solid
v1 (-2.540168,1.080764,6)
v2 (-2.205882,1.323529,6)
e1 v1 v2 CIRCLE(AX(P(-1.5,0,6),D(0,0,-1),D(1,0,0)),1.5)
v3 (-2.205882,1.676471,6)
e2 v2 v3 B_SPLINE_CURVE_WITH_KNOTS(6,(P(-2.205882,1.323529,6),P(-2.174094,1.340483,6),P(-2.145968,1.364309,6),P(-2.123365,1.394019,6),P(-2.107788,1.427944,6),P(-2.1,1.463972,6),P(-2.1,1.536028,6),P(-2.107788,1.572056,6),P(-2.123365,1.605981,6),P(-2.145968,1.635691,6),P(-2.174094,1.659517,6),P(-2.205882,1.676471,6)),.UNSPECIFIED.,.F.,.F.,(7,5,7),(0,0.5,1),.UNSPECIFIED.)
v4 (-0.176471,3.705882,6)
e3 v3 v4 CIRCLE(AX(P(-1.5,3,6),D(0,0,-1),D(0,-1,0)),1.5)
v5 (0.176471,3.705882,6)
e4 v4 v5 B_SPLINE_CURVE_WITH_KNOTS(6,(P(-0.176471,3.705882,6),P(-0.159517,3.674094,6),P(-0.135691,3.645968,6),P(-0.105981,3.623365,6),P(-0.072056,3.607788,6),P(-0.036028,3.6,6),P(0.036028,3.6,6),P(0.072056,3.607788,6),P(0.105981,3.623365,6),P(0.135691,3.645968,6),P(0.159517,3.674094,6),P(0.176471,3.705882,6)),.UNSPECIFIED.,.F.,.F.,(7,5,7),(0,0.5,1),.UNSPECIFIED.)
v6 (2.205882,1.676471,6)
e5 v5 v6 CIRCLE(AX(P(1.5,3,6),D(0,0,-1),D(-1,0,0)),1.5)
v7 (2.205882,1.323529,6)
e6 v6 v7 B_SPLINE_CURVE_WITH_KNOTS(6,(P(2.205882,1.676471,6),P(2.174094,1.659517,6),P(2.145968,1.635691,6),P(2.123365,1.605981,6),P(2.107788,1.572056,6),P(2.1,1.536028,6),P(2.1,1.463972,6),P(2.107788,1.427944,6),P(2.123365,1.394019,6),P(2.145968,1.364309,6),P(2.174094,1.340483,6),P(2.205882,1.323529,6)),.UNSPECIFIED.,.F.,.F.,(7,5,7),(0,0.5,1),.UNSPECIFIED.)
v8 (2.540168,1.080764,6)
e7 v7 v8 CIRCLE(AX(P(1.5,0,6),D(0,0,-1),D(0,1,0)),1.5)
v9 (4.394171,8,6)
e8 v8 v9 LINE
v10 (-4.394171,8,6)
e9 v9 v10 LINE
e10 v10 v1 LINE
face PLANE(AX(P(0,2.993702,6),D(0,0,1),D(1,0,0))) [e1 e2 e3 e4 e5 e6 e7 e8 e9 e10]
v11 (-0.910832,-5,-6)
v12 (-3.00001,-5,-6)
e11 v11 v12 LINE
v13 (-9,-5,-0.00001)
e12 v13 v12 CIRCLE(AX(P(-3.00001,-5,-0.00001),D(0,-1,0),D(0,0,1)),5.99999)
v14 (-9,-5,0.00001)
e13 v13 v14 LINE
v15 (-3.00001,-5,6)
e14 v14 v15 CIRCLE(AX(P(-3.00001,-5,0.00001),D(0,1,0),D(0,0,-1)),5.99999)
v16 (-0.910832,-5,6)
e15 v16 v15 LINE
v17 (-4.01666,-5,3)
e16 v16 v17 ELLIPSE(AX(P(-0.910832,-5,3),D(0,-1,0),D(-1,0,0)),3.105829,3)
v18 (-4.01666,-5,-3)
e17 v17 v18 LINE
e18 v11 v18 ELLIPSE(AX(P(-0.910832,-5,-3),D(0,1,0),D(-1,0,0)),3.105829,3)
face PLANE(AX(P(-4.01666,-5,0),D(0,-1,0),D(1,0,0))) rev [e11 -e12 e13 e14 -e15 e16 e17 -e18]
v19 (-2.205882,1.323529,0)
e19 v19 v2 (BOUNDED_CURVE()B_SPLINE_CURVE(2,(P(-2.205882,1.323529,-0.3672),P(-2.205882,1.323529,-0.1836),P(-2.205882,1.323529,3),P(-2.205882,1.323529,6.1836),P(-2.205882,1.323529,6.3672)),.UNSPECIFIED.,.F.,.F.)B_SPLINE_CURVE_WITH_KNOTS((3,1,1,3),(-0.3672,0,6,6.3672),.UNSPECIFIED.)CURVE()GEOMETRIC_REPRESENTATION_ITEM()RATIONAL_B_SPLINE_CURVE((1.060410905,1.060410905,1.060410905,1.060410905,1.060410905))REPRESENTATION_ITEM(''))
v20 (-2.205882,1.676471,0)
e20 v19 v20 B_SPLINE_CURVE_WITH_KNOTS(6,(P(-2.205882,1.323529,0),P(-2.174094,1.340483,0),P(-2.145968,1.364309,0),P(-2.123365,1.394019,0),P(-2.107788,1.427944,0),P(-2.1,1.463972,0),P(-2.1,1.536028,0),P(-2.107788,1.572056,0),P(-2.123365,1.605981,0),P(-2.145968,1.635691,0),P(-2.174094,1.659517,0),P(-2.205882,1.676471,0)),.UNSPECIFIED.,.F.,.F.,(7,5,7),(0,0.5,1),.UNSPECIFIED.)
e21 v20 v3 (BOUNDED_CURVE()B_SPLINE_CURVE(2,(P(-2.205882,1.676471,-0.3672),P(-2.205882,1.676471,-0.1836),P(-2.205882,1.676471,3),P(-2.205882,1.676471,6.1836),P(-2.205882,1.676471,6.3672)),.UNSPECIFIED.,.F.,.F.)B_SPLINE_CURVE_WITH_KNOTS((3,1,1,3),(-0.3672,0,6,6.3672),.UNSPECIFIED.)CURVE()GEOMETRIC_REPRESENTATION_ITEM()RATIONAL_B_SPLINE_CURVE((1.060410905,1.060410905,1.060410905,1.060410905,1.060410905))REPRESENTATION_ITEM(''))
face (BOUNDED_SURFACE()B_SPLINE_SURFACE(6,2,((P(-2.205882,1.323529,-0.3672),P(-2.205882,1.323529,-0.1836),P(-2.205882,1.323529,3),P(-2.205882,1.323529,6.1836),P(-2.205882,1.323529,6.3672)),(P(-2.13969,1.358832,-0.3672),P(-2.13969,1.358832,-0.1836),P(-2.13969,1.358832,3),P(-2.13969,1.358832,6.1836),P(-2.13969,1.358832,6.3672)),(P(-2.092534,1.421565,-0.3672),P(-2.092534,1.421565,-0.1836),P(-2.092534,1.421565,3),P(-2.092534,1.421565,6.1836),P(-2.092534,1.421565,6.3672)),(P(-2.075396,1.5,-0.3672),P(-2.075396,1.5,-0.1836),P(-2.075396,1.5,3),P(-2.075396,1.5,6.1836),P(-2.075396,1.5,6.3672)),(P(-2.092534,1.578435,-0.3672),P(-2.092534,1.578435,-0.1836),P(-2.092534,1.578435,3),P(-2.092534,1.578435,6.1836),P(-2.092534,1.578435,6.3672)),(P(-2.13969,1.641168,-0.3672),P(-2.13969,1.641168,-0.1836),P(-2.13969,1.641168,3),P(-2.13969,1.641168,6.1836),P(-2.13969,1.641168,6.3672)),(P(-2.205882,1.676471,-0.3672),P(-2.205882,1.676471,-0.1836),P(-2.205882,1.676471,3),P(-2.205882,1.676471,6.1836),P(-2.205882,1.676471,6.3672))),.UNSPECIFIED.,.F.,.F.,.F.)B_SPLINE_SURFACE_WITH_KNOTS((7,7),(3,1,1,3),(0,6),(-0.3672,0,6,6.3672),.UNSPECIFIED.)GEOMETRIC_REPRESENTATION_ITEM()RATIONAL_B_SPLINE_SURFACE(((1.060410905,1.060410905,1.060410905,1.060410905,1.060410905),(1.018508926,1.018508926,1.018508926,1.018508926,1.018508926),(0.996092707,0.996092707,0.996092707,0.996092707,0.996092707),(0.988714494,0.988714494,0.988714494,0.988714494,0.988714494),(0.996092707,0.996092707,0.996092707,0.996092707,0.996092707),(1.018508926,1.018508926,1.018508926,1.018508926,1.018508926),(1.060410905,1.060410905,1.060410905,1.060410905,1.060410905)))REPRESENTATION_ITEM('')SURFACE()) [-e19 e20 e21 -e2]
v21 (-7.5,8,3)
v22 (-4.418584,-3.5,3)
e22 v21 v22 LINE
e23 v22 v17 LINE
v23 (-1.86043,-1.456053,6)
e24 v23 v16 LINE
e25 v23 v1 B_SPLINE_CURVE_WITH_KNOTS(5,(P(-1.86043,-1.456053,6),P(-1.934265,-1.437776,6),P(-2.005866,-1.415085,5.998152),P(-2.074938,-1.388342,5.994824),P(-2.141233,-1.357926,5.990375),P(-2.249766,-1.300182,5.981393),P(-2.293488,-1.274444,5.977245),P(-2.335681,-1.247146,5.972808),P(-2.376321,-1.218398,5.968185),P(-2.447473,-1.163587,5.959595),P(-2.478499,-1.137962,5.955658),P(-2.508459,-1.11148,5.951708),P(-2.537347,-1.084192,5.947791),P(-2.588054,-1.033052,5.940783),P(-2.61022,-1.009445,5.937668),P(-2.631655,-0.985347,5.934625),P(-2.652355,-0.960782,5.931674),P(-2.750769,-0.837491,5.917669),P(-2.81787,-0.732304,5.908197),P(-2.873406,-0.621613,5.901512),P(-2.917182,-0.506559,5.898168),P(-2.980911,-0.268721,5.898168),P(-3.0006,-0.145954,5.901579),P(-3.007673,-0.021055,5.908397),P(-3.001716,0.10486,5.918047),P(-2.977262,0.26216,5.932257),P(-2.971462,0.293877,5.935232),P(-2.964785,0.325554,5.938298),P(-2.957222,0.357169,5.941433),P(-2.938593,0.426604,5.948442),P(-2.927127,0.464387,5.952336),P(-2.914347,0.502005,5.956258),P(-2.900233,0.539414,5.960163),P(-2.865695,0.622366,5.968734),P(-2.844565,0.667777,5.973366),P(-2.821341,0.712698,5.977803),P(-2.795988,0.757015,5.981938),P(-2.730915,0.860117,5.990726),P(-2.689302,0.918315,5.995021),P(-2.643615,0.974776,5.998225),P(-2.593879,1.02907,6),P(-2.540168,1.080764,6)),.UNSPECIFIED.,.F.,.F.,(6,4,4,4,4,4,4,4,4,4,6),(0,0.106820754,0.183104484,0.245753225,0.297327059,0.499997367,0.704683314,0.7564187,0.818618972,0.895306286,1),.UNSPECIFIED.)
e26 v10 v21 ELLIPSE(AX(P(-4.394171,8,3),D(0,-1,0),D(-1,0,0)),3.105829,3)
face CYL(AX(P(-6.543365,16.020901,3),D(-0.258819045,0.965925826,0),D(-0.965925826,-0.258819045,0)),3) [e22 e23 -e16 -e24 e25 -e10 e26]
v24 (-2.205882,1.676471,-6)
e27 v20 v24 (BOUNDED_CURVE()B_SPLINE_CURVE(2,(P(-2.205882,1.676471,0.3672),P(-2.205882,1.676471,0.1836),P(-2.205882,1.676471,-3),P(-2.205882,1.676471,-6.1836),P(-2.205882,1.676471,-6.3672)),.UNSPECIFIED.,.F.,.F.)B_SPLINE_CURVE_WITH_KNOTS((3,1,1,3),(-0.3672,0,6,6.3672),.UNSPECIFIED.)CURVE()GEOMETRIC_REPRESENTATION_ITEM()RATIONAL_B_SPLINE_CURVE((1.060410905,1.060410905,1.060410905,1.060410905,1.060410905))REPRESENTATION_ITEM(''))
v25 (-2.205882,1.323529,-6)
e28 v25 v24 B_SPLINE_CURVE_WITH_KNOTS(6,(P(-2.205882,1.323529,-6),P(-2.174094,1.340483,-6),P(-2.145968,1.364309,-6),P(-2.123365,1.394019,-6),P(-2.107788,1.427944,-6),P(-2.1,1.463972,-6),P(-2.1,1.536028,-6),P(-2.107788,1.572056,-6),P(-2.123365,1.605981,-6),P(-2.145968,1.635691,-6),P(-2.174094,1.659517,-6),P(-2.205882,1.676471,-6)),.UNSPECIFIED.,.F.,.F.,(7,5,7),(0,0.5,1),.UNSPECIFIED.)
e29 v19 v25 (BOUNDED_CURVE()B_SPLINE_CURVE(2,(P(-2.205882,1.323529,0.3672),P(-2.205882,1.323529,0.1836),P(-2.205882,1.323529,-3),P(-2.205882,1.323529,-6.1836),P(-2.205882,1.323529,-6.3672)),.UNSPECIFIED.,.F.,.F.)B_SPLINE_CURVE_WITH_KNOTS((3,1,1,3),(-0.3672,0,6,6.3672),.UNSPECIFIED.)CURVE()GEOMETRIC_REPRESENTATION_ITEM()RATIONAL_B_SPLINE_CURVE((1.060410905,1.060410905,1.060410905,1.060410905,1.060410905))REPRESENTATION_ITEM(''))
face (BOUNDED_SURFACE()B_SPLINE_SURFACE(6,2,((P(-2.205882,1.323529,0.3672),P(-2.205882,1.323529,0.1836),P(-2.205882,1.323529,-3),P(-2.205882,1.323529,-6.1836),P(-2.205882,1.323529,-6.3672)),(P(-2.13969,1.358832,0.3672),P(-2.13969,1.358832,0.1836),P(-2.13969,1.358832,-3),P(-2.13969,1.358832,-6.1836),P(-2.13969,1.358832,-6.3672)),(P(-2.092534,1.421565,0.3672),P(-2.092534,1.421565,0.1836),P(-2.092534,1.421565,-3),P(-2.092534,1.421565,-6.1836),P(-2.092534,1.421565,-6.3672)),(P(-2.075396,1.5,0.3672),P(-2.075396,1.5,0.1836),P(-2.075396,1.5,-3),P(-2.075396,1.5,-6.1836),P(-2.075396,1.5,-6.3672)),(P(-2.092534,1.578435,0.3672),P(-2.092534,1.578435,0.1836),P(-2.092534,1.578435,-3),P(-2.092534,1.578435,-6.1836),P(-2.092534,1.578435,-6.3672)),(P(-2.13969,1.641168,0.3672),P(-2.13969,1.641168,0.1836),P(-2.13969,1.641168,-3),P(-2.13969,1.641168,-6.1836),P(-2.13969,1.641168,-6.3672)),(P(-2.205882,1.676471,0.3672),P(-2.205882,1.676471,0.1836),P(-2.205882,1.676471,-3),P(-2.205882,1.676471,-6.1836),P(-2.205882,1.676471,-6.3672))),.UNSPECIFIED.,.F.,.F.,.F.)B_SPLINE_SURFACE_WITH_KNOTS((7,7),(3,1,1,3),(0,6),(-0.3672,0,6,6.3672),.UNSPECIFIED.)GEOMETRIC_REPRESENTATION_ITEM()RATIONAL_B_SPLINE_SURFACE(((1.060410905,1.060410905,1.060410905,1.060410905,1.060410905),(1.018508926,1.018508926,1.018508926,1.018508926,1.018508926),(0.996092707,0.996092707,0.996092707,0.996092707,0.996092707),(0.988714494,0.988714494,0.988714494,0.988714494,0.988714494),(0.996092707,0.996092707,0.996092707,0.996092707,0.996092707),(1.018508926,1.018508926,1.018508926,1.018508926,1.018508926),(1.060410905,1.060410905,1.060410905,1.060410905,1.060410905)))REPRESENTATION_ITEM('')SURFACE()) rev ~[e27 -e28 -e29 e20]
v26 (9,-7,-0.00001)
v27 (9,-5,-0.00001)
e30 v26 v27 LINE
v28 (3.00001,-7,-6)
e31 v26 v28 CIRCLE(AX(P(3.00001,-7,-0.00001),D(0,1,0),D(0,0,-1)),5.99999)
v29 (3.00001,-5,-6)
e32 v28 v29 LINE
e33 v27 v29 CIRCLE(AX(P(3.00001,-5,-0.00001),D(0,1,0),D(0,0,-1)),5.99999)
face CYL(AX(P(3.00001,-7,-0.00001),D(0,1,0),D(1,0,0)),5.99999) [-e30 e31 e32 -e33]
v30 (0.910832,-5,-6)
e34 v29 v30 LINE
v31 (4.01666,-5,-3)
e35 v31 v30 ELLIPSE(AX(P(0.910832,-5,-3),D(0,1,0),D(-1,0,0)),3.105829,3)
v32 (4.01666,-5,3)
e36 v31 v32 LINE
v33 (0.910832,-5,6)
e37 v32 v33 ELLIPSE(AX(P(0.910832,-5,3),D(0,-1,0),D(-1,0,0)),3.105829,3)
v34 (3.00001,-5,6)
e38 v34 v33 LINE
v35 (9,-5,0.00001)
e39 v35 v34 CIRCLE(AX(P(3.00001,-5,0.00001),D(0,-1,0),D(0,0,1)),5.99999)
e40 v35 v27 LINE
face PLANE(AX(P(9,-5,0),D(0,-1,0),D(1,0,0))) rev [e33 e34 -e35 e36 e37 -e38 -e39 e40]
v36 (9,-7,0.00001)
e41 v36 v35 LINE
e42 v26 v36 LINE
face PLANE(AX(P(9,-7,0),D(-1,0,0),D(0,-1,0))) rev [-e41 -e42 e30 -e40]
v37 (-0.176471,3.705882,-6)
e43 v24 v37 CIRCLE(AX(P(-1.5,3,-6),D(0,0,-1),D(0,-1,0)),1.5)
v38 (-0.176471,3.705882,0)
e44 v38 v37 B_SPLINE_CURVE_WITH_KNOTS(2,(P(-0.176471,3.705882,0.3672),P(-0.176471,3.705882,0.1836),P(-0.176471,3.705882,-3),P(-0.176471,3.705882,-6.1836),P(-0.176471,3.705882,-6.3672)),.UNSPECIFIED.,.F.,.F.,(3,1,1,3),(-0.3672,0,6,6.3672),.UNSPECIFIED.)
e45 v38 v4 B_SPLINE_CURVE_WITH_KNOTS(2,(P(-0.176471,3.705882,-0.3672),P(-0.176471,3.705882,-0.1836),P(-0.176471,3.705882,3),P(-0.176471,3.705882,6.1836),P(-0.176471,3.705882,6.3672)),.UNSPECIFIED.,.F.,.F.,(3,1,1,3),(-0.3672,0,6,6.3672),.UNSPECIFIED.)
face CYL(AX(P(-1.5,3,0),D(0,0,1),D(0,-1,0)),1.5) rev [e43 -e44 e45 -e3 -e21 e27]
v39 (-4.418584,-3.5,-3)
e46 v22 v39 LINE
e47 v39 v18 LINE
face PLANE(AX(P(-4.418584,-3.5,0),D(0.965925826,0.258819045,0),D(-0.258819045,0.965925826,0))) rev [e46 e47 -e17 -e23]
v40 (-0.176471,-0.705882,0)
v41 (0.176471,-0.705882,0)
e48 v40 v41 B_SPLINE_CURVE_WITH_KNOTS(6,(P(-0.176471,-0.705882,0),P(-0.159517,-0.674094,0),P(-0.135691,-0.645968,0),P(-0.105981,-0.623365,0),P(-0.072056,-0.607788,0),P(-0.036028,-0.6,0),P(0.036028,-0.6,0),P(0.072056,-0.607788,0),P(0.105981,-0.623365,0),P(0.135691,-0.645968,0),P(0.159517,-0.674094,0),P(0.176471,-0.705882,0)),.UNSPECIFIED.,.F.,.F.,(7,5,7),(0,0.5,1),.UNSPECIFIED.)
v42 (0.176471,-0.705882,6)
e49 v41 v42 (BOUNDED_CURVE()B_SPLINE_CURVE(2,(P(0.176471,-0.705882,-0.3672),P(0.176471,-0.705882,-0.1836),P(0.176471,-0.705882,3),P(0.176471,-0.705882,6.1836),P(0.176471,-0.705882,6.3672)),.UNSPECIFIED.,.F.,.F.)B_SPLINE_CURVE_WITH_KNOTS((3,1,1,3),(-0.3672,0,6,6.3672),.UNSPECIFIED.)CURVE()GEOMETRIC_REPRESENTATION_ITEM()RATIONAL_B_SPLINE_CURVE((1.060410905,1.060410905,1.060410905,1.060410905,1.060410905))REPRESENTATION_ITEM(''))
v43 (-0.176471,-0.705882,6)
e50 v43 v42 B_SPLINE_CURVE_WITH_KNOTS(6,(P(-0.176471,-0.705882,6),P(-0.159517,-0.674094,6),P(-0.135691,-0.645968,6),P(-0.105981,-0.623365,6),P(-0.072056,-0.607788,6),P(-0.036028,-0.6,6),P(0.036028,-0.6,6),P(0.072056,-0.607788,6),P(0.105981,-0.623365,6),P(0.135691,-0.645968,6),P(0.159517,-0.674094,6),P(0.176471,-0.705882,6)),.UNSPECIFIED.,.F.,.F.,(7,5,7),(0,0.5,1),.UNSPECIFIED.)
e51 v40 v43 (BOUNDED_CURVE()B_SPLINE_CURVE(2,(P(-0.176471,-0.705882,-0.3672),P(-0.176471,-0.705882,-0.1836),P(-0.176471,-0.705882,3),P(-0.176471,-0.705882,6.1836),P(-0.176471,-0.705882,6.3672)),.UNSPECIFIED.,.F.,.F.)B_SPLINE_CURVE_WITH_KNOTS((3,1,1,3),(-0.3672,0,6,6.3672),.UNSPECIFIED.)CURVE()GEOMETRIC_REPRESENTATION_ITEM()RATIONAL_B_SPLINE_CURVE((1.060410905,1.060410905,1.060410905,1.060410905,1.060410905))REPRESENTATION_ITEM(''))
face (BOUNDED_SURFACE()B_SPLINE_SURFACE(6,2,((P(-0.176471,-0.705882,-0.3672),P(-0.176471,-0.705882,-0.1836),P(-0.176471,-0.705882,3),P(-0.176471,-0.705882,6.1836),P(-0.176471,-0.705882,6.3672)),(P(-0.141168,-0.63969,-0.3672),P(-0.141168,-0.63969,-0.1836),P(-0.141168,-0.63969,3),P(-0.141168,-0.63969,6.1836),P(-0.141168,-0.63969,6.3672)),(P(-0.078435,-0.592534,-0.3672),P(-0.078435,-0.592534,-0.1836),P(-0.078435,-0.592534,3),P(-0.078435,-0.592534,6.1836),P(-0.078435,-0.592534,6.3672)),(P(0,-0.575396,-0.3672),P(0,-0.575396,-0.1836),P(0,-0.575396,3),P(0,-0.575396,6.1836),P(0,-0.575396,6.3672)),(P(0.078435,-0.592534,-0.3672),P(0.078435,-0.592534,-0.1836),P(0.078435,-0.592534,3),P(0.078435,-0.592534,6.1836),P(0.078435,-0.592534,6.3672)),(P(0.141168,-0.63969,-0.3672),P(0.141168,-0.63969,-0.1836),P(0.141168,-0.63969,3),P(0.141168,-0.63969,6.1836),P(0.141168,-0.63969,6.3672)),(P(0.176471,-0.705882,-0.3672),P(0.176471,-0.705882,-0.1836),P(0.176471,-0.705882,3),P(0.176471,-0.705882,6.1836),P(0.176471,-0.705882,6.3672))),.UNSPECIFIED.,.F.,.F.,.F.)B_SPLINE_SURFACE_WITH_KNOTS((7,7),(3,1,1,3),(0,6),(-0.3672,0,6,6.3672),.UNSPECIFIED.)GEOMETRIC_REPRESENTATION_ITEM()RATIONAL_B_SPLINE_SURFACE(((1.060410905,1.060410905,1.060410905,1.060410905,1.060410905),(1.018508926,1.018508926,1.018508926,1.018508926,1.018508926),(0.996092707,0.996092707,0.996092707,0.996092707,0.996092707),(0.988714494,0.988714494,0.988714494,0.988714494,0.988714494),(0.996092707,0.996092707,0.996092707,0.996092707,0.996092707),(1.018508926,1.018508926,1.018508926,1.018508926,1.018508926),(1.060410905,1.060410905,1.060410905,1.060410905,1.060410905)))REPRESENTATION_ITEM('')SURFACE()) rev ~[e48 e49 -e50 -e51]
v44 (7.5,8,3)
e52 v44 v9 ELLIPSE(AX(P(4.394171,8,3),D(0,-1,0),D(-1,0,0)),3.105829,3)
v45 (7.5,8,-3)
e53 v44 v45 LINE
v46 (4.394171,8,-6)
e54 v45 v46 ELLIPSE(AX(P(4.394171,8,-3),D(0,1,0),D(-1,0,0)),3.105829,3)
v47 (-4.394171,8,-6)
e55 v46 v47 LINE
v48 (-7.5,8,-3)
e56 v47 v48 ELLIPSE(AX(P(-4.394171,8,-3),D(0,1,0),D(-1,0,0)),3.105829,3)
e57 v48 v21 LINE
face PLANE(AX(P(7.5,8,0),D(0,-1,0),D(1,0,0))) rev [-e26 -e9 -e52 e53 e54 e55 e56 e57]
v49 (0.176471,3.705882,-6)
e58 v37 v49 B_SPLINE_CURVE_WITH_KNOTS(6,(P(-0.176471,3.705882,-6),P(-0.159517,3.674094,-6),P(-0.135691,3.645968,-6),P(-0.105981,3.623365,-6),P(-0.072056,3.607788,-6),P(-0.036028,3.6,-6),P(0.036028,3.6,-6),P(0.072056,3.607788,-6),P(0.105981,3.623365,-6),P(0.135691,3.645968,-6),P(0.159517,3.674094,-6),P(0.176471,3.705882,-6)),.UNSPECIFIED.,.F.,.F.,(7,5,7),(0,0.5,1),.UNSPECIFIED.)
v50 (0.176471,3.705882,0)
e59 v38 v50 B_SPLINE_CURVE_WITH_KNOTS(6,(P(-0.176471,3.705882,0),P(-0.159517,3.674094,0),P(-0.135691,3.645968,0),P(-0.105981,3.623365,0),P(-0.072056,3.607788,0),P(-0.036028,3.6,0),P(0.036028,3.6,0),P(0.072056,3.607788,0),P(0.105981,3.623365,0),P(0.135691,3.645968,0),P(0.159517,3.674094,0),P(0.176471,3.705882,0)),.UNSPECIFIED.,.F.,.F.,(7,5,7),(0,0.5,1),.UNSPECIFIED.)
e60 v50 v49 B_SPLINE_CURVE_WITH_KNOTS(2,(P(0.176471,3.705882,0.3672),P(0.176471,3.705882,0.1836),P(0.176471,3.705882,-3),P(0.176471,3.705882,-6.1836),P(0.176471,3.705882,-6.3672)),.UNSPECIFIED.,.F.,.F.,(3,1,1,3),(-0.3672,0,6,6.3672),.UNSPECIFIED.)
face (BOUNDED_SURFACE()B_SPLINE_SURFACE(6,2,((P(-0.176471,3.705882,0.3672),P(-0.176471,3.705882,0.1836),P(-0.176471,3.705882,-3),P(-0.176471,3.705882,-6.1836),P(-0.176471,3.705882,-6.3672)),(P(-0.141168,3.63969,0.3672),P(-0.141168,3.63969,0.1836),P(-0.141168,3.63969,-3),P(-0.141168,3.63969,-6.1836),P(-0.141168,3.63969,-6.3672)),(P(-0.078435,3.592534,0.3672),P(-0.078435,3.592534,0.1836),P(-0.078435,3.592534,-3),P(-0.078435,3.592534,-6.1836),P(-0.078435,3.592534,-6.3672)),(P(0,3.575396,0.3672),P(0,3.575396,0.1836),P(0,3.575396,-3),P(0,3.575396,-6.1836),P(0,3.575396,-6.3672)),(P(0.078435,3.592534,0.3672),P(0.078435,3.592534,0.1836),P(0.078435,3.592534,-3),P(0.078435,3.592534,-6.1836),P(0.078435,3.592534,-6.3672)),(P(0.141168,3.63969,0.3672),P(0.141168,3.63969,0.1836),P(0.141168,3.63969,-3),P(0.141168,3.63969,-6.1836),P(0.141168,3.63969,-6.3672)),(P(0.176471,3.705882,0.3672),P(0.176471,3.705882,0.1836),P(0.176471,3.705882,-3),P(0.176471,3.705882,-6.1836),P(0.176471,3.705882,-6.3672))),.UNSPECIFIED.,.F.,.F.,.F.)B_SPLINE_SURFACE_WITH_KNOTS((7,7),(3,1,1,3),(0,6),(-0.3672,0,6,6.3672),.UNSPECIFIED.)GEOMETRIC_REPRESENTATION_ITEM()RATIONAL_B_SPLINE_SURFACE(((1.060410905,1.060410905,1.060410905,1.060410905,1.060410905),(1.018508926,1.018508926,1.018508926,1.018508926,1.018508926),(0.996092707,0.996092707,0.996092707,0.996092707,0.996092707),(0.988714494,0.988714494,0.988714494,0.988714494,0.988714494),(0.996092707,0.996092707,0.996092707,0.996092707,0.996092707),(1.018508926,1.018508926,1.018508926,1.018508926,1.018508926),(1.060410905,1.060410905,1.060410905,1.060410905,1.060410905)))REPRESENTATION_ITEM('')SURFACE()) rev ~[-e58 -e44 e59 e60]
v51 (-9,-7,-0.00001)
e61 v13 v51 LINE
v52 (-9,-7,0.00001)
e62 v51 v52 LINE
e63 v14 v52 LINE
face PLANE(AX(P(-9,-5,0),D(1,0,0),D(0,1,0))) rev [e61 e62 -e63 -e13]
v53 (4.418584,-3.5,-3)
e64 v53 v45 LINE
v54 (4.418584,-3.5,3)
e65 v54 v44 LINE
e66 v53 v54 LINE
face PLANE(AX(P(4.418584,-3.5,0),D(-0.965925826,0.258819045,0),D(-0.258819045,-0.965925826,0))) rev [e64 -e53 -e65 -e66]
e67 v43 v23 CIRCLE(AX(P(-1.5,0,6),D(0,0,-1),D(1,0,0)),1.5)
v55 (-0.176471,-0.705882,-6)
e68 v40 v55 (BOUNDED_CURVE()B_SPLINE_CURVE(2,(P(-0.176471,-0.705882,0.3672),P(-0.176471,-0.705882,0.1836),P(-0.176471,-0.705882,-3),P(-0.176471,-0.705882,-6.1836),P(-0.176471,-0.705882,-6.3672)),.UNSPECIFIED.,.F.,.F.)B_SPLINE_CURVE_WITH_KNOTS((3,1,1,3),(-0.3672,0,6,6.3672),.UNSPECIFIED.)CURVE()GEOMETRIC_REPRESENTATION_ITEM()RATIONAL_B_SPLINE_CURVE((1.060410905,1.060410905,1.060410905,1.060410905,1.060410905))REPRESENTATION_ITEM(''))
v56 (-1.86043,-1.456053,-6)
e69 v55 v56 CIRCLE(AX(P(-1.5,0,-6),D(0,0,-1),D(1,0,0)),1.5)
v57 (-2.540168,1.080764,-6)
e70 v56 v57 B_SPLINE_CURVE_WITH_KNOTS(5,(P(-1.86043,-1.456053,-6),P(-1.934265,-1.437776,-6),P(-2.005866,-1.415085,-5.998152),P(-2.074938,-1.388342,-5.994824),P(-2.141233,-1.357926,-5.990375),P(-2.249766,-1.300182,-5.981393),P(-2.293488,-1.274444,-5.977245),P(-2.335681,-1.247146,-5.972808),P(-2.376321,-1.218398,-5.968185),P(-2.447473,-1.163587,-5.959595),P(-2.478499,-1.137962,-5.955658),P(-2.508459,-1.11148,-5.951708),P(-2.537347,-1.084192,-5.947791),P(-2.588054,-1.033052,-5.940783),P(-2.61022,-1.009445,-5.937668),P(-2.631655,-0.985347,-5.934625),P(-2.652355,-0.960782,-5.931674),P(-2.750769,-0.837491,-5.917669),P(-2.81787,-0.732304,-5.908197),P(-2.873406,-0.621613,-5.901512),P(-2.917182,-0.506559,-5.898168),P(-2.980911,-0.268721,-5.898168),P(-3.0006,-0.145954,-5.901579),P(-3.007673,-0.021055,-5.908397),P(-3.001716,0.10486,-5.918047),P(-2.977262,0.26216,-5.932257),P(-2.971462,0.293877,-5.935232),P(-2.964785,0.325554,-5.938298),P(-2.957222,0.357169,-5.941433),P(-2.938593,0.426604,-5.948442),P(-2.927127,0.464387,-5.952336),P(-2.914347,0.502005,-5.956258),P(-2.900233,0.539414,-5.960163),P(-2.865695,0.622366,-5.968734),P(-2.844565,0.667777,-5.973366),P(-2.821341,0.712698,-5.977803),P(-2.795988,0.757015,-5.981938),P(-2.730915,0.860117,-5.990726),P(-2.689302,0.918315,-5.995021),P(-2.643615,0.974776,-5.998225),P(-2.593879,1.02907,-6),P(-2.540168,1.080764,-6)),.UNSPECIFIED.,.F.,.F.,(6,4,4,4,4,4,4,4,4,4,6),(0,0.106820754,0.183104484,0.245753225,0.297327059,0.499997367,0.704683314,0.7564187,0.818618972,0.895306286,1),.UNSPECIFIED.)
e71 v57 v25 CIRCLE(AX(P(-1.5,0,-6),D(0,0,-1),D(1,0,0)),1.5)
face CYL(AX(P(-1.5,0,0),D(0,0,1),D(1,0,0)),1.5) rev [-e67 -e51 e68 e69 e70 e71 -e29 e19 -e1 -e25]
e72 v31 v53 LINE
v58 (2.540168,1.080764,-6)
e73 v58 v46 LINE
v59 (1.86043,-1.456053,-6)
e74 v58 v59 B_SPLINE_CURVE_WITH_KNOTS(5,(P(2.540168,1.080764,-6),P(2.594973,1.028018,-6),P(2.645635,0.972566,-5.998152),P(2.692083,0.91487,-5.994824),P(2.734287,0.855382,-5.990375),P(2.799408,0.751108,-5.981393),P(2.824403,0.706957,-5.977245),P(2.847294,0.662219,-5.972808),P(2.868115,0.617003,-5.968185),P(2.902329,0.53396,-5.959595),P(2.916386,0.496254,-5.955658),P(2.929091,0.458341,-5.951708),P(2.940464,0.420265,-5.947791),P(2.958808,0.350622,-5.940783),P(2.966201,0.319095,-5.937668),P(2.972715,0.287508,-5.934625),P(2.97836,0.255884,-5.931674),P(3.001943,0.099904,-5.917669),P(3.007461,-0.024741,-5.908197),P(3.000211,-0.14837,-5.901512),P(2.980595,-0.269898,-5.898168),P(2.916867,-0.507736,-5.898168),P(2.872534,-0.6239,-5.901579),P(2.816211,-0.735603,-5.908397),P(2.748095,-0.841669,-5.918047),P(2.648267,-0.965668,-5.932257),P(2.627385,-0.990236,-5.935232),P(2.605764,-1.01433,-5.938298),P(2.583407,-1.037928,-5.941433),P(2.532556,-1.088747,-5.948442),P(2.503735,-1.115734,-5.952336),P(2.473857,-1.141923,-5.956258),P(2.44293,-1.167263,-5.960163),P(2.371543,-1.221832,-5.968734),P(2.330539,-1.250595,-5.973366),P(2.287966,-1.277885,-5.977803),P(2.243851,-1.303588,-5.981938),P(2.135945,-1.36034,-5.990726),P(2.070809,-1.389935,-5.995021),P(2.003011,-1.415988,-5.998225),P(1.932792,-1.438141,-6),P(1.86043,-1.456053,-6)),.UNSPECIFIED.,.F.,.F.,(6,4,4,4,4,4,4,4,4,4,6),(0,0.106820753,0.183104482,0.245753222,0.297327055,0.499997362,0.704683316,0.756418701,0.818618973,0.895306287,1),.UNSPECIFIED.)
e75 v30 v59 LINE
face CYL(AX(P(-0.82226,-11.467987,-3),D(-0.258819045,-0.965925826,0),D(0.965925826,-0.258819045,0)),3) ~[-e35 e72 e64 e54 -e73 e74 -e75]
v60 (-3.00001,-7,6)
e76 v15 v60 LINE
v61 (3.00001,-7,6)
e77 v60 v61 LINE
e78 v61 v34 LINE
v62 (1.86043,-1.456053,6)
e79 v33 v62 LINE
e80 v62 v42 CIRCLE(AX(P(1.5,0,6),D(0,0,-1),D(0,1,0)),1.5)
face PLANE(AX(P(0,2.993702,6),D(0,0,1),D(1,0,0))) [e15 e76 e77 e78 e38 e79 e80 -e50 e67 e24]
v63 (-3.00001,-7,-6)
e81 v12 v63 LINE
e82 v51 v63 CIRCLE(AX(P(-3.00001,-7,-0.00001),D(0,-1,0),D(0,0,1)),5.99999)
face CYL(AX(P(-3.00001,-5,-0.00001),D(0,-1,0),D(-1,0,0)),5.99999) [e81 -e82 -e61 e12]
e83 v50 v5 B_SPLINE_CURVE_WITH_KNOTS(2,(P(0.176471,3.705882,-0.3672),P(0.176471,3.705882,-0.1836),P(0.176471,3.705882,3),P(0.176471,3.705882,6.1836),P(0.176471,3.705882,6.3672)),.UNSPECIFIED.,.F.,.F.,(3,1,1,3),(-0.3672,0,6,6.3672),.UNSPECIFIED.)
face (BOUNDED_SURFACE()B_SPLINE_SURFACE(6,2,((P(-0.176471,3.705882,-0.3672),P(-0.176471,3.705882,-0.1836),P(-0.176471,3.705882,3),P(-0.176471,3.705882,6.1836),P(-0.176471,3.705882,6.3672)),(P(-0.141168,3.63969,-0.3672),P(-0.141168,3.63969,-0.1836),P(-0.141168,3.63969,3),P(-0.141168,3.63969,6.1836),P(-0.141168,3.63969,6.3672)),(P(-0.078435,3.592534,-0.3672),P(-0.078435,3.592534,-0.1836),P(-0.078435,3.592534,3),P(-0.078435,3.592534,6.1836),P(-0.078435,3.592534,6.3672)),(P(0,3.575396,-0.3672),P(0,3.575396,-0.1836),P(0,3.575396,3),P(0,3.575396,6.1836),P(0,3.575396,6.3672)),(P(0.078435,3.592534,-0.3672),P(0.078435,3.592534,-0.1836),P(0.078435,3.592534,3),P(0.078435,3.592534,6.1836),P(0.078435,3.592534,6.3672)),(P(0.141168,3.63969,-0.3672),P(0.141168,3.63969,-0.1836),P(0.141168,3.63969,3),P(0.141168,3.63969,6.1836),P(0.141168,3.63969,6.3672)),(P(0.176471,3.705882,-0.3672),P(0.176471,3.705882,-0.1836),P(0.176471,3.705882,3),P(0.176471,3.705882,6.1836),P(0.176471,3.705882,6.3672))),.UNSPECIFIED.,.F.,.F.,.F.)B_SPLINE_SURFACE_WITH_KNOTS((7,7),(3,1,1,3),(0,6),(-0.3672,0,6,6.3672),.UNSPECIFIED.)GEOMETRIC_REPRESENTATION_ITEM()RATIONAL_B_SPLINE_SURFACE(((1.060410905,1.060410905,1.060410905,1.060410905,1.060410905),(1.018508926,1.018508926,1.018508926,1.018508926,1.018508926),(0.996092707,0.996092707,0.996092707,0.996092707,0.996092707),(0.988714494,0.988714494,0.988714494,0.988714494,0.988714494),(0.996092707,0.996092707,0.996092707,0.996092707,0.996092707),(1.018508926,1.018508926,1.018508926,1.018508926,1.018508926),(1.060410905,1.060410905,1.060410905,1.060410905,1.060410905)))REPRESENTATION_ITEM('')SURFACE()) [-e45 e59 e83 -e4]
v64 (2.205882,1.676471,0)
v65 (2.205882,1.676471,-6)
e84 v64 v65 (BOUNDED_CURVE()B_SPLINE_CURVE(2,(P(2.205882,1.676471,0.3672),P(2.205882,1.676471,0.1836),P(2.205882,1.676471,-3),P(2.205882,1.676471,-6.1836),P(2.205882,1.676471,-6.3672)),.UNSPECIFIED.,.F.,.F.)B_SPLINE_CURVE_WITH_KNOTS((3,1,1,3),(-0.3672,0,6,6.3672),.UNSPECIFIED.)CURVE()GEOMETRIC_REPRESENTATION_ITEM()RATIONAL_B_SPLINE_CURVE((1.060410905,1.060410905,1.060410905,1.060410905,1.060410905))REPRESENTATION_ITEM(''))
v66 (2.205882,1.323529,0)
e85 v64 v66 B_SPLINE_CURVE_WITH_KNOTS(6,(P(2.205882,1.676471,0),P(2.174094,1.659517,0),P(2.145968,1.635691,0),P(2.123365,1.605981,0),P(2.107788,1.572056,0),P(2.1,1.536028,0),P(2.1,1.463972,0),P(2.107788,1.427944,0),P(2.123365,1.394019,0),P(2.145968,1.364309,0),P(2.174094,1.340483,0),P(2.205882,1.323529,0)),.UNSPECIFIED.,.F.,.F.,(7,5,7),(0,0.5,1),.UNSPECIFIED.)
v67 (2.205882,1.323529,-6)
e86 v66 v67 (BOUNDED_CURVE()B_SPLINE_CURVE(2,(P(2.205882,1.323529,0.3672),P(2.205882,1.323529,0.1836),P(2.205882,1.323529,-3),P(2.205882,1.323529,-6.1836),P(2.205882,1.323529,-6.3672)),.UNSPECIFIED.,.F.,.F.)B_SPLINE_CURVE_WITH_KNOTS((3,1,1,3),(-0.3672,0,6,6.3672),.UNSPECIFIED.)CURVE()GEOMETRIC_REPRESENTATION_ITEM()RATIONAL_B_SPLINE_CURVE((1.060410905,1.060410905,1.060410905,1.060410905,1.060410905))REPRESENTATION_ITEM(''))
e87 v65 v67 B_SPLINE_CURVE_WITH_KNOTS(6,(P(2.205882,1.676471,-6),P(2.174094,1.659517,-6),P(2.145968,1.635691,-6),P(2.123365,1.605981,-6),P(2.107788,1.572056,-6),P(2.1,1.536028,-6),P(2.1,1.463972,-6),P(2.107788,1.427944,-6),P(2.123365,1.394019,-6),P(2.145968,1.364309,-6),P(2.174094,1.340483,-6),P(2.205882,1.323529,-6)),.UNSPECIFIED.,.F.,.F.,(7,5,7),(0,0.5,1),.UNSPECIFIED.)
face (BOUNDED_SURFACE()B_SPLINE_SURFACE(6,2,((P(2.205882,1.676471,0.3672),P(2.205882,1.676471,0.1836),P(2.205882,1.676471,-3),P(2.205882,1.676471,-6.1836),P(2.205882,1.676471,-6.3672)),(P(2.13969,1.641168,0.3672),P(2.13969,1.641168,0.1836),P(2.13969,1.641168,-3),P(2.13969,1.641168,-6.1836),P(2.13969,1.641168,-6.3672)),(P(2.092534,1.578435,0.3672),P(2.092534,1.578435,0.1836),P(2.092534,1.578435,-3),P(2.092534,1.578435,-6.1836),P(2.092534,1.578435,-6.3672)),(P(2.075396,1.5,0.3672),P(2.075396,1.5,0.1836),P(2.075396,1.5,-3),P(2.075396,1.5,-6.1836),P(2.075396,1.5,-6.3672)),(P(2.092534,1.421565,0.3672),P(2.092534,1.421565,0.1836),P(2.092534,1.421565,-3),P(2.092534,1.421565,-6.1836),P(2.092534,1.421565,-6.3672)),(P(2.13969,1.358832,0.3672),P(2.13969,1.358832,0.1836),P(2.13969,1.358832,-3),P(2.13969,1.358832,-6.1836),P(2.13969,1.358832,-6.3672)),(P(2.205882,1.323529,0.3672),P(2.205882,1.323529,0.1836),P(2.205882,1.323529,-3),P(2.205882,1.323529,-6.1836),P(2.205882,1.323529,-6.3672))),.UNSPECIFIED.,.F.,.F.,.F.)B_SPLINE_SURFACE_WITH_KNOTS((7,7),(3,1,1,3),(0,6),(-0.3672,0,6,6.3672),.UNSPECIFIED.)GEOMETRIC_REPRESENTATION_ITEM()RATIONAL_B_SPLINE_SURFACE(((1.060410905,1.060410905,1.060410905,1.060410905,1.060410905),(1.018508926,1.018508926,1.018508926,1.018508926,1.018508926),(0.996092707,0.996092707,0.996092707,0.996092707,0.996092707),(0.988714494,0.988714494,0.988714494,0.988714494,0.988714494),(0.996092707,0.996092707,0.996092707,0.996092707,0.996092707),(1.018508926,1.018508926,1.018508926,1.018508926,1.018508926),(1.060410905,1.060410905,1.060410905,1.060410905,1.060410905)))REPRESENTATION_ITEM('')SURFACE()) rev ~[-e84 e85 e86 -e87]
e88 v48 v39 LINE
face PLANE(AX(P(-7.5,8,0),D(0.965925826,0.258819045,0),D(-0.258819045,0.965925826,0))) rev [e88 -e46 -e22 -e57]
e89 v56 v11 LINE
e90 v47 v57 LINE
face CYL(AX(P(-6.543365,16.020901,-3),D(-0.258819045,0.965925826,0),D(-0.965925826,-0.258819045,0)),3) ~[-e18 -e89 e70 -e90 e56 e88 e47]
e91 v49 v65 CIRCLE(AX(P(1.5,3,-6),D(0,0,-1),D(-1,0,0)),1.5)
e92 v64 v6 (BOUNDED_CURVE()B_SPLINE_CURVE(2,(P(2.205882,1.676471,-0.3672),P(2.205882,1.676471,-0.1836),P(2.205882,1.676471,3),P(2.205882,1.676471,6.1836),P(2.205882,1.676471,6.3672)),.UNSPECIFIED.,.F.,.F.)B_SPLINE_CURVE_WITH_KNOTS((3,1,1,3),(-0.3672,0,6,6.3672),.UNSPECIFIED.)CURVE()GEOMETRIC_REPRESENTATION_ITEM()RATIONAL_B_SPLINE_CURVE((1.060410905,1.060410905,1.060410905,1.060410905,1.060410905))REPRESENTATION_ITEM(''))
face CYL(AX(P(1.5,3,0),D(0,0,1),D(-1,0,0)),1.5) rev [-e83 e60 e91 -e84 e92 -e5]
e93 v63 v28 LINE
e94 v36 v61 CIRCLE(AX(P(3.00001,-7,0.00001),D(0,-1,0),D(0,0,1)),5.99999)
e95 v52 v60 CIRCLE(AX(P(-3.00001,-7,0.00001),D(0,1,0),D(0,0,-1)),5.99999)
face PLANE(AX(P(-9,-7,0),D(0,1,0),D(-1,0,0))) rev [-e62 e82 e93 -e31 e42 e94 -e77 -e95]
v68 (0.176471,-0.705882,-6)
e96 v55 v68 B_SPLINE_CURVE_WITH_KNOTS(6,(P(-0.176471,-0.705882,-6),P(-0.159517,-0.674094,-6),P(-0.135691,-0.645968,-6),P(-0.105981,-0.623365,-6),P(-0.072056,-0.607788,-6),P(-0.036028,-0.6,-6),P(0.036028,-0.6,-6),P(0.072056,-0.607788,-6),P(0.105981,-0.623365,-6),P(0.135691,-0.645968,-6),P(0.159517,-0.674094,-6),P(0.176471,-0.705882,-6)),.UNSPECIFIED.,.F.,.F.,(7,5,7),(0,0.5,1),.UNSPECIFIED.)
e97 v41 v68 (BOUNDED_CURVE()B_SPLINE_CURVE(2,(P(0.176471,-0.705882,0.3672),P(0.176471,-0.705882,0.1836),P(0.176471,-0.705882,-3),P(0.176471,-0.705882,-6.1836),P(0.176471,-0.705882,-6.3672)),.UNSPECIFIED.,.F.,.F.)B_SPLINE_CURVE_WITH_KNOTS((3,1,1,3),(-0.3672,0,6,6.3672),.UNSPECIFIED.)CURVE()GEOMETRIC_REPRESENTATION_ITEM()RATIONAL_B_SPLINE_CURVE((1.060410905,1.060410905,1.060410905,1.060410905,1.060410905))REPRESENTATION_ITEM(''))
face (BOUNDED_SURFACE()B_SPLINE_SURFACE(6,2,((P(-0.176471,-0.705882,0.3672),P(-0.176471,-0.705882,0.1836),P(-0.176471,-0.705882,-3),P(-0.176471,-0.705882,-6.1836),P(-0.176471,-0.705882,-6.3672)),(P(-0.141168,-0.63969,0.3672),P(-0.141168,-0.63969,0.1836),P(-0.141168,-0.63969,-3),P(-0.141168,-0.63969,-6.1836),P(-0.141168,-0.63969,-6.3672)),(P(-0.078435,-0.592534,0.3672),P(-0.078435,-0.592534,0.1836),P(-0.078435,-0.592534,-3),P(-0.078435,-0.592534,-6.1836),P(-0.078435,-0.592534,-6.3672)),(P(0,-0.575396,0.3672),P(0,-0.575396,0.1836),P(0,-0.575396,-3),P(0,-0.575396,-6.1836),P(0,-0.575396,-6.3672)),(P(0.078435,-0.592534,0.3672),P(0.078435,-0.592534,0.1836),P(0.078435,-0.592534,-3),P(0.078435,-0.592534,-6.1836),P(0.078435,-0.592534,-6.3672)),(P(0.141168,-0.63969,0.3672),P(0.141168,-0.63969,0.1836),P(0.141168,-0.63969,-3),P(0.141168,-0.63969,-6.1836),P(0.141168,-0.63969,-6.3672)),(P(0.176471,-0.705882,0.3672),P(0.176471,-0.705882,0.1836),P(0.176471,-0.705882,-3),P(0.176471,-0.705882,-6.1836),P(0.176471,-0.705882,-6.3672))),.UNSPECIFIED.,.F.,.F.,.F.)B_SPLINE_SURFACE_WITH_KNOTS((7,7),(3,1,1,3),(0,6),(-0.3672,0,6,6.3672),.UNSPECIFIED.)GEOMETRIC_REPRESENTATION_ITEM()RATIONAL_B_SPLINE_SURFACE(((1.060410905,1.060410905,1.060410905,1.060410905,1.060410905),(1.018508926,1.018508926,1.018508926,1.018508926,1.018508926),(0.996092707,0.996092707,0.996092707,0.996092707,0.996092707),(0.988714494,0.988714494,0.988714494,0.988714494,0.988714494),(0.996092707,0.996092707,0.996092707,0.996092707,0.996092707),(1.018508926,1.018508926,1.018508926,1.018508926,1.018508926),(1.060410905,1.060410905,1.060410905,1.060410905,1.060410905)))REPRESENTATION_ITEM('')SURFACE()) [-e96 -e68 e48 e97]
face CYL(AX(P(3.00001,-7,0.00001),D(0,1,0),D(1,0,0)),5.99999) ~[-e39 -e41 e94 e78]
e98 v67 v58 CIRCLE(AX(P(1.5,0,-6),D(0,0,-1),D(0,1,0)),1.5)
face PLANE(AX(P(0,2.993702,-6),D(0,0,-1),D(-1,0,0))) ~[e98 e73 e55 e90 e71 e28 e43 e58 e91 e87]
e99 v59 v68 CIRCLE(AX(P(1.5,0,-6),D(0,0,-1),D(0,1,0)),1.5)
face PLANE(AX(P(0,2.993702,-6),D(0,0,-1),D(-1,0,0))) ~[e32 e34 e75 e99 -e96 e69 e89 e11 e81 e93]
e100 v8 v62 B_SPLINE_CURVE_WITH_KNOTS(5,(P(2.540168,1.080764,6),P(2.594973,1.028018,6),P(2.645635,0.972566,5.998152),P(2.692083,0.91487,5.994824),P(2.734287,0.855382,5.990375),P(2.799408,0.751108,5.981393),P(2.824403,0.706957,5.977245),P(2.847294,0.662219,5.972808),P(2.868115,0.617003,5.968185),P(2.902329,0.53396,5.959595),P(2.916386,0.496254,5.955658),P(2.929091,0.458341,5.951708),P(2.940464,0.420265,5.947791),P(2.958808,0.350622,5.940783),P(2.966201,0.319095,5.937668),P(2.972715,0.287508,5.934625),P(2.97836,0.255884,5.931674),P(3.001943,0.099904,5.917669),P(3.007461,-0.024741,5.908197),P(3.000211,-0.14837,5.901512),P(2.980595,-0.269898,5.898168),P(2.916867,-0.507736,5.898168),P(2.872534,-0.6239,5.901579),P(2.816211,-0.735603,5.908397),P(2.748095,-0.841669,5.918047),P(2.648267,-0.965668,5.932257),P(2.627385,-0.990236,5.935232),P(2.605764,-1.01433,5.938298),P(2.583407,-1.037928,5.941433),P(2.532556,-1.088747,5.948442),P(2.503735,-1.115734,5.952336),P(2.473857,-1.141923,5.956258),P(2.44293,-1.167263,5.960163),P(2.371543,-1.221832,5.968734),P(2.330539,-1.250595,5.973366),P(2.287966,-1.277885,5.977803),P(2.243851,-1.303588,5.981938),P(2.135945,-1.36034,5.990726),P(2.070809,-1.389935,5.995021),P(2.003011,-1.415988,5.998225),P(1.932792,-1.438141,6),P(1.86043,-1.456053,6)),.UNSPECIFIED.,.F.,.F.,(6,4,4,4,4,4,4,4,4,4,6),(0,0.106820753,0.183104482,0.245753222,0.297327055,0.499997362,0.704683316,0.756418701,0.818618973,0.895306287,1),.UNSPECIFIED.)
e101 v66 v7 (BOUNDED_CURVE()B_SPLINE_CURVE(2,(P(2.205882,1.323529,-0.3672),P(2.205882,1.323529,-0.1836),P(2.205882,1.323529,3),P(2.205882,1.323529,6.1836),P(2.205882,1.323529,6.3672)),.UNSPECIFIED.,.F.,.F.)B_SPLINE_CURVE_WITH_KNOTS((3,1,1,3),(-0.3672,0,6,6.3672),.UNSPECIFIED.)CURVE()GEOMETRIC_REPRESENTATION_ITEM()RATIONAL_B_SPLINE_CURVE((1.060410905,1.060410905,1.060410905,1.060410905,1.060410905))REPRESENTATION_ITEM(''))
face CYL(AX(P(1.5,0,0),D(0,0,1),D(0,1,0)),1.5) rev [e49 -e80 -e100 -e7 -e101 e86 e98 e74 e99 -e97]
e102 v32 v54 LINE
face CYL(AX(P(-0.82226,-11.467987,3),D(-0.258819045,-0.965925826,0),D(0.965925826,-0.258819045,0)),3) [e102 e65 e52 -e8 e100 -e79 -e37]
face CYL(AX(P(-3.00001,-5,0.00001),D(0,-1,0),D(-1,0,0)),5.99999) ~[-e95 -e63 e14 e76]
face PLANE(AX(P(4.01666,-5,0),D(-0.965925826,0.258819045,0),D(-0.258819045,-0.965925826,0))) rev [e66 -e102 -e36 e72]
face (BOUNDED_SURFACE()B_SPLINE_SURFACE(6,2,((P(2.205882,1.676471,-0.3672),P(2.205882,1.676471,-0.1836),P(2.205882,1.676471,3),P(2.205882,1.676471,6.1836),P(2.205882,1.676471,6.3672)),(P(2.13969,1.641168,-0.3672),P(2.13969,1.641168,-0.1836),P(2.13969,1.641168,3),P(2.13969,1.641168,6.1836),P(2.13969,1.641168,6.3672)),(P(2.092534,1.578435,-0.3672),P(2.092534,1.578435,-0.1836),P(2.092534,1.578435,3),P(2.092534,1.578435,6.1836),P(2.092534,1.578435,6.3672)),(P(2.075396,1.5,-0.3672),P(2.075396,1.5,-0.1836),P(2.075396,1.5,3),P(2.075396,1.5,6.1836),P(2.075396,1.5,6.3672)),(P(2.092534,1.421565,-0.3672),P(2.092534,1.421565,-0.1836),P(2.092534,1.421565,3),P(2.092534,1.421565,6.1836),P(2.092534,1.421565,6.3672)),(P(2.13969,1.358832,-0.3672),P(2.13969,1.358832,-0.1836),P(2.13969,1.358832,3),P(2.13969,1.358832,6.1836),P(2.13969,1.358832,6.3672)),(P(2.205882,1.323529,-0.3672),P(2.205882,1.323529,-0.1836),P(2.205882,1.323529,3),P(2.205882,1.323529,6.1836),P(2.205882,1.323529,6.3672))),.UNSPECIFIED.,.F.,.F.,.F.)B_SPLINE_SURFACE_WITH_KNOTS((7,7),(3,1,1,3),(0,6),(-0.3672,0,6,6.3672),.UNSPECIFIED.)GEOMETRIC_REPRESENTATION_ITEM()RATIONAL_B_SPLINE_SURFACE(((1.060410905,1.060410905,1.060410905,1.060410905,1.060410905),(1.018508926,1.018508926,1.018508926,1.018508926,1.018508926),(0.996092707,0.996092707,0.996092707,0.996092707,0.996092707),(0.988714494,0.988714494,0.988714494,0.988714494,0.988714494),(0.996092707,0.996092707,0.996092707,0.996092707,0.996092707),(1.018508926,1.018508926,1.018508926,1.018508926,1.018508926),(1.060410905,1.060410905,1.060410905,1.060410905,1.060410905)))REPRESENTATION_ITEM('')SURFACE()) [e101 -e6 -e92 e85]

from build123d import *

# Parameters (mm, degrees)
F1_DEPTH    = 6
F2_F1_R     = 0.2
F2_F2_R     = 0.2
F3_T4_DEPTH = 28.4585903453
F3_T9_DEPTH = 28.4585903453
F4_R        = 5.99999


# Not quite as in the source:
# - a fillet or chamfer that OpenCascade refuses, or shapes differently, is made with other operations: its cross-section is extruded or revolved along the edge and cut away or added
# - a fillet or chamfer is up to 0.001 mm smaller than in the source, because OpenCascade refuses the exact size


with BuildPart() as f1:
    # F0 (on Top) → F1 (new body)
    with BuildSketch(Plane.XY):
        Polygon((-7.5, 8), (-4.418584287, -3.5), (4.418584287, -3.5), (7.5, 8), align=None)
        with BuildLine():
            ThreePointArc((-1.5, 1.5), (-2.5606601718, 4.0606601718), (0, 3))
            ThreePointArc((0, 3), (2.5606601718, 4.0606601718), (1.5, 1.5))
            ThreePointArc((1.5, 1.5), (2.5606601718, -1.0606601718), (0, 0))
            ThreePointArc((0, 0), (-2.5606601718, -1.0606601718), (-1.5, 1.5))
        make_face(mode=Mode.SUBTRACT)
        Polygon((-9, -5), (-9, -7), (9, -7), (9, -5), (4.0166604984, -5), (-4.0166604984, -5), align=None)
        Polygon((-4.418584287, -3.5), (-4.0166604984, -5), (4.0166604984, -5), (4.418584287, -3.5), align=None)
    extrude(amount=F1_DEPTH)

    # F2: fillet of radius 0.2 on 4 edges, made by hand

    # F2_f1
    f2_f1_edges = [f1.edges().sort_by_distance(p)[0] for p in [
        (-1.5, 1.5, 3),
        (0, 3, 3),
        (1.5, 1.5, 3),
    ]]
    fillet(f2_f1_edges, radius=F2_F1_R)

    # F2_f2
    f2_f2_edges = [f1.edges().sort_by_distance(p)[0] for p in [
        (0, 0, 3),
    ]]
    fillet(f2_f2_edges, radius=F2_F2_R)

    # F3: fillet of radius 3 on 2 edges, made by hand


with BuildPart() as f3_tool2:
    # F3_s3 → F3_t4 (new body)
    with BuildSketch(Plane(origin=(-4.4435475741, 16.5835453123, 0), x_dir=(0, 0, 1), z_dir=(0.2588190451, -0.9659258263, 0))):
        with BuildLine():
            ThreePointArc((3, 5.1738913363), (5.1213203436, 4.2952116799), (6, 2.1738913363))
            Line((6, 2.1738913363), (6, 5.1738913363))
            Line((6, 5.1738913363), (3, 5.1738913363))
        make_face()
    extrude(amount=F3_T4_DEPTH)

    split(bisect_by=Plane.XZ.offset(5), keep=Keep.BOTTOM)


with BuildPart() as f1_1:
    add(f1.part)

    # F3_t1: cut F3_tool2
    add(f3_tool2.part, mode=Mode.SUBTRACT)


with BuildPart() as f3_tool7:
    # F3_s8 → F3_t9 (new body)
    with BuildSketch(Plane(origin=(-2.9220776041, -10.905342082, 0), x_dir=(0, 0, 1), z_dir=(0.2588190451, 0.9659258263, 0))):
        with BuildLine():
            ThreePointArc((3, 5.1738913363), (5.1213203436, 4.2952116799), (6, 2.1738913363))
            Line((6, 2.1738913363), (6, 5.1738913363))
            Line((6, 5.1738913363), (3, 5.1738913363))
        make_face()
    extrude(amount=F3_T9_DEPTH)

    split(bisect_by=Plane.XZ.offset(5), keep=Keep.BOTTOM)


with BuildPart() as f1_2:
    add(f1_1.part)

    # F3_t6: cut F3_tool7
    add(f3_tool7.part, mode=Mode.SUBTRACT)

    # F4 (radius 6 in the source; OpenCascade refuses exactly that, so slightly less here)
    f4_edges = [f1_2.edges().sort_by_distance(p)[0] for p in [
        (9, -6, 6),
        (-9, -6, 6),
    ]]
    fillet(f4_edges, radius=F4_R)

    # F5: F1 across plane


with BuildPart() as f1_3:
    add(f1_2.part)
    add(f1_2.part.mirror(Plane.XY))


solid = f1_3.part
